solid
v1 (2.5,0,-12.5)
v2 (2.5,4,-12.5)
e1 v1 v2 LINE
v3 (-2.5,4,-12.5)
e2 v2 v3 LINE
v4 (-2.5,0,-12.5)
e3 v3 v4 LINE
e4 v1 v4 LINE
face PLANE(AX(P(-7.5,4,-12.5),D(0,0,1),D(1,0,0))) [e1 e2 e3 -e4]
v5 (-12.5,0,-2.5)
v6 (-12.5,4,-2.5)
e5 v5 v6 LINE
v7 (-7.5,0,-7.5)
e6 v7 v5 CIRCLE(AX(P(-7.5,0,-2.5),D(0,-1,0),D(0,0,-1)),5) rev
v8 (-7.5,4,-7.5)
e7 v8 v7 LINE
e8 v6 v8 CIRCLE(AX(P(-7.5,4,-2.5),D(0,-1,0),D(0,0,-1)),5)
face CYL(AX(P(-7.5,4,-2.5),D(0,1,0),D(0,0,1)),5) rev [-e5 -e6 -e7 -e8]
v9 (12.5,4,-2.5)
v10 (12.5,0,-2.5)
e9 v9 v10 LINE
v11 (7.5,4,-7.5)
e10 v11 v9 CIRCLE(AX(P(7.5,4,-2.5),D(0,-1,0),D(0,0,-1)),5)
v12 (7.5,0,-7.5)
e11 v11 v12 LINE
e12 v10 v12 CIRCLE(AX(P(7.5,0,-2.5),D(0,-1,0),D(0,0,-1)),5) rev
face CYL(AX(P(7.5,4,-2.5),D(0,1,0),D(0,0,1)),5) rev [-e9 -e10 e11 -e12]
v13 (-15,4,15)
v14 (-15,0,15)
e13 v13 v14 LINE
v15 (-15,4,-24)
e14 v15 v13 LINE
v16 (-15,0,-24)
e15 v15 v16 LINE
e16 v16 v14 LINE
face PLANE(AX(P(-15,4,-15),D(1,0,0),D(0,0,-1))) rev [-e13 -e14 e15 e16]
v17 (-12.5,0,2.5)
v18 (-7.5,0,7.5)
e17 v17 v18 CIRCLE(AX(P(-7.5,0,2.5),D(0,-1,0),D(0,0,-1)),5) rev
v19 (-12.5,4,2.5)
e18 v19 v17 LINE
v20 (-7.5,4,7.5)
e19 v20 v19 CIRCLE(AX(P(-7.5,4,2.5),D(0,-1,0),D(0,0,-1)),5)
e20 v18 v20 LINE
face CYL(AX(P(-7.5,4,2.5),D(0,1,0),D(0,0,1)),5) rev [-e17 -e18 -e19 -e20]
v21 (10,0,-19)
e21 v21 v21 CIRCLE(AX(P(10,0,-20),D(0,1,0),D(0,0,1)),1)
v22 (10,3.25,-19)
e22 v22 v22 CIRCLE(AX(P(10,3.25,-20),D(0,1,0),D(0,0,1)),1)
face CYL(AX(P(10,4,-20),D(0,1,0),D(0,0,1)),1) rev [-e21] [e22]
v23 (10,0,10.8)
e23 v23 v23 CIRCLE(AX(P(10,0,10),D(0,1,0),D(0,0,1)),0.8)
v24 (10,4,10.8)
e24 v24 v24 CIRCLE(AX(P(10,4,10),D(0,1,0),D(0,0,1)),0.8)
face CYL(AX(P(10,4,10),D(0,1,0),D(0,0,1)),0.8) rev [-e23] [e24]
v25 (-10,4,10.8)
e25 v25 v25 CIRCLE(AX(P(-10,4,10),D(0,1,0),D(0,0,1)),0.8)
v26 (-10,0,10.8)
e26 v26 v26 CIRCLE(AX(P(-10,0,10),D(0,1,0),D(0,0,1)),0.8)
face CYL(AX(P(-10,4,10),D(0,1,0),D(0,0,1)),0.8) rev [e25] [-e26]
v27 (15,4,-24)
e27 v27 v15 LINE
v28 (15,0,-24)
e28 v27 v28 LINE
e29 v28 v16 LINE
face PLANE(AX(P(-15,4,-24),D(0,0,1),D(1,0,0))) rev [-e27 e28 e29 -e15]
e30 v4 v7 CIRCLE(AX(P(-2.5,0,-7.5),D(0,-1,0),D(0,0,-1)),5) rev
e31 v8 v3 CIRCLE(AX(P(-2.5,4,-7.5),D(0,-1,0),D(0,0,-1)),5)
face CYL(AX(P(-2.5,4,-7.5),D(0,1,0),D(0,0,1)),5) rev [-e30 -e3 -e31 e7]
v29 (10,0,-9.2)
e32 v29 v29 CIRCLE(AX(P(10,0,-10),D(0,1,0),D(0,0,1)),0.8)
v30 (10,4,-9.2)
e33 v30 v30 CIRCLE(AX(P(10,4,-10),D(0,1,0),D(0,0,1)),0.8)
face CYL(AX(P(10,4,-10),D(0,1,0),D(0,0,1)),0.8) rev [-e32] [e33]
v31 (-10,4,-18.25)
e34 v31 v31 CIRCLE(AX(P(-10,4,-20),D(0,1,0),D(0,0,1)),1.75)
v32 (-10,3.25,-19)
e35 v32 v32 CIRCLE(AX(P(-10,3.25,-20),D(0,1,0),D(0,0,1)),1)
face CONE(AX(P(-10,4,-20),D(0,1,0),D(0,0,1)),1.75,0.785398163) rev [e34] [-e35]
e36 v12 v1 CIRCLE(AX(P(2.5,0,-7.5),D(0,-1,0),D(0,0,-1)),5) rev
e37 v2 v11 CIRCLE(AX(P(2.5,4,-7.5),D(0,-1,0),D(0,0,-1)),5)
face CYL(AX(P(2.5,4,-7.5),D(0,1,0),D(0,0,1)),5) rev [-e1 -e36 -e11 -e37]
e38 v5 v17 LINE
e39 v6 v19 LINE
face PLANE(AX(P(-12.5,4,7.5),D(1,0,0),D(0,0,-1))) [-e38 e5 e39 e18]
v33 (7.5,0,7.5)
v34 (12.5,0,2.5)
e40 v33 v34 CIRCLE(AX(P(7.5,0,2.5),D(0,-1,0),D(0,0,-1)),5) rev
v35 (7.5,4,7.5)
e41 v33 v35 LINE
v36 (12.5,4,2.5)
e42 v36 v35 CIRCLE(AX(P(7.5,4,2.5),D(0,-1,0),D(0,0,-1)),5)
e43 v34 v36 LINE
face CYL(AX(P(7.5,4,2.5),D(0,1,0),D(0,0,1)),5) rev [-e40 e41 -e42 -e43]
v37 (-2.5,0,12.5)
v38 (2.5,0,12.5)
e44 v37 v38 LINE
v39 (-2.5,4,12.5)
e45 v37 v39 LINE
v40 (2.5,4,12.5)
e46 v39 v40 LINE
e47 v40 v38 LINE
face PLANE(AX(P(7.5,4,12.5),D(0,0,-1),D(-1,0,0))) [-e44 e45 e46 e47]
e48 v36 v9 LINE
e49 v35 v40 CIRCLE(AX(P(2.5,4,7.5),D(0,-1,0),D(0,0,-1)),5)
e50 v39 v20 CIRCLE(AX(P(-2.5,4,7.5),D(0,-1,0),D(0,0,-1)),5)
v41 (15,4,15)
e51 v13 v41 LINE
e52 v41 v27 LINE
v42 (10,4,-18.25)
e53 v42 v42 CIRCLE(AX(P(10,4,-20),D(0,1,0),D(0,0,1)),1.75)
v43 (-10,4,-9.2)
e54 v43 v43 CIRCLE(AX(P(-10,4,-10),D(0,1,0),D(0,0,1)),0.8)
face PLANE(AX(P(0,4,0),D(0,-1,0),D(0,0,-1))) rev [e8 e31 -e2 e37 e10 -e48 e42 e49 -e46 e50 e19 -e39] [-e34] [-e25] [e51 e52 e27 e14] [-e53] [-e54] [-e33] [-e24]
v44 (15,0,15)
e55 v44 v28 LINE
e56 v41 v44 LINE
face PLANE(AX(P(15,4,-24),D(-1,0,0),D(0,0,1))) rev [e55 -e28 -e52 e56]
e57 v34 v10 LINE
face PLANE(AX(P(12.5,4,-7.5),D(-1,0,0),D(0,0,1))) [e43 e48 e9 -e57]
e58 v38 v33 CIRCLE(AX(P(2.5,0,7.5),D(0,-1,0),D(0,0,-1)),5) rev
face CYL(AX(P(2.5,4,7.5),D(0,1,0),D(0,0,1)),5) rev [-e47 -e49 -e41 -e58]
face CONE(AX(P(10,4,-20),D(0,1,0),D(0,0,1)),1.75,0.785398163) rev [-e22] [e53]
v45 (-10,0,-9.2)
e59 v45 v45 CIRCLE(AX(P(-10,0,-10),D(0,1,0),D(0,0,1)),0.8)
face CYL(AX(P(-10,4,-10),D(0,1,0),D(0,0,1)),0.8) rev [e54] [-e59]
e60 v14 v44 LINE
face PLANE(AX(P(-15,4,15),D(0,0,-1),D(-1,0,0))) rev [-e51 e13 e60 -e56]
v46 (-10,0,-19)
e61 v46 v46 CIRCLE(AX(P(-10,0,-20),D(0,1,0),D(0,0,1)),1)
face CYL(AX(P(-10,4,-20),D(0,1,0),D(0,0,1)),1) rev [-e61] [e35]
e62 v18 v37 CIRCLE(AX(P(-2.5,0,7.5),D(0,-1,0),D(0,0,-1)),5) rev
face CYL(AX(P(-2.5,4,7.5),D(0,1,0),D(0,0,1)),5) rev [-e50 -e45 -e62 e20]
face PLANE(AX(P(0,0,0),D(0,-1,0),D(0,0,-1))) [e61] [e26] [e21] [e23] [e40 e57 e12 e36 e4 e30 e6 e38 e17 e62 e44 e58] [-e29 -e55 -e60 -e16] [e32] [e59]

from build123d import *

# Parameters (mm, degrees)
AUFSATZ_LINEAR_AUSTRAGEN1_DEPTH                      = 4
VERRUNDUNG1_R                                        = 5
FORMSENKUNG_F_R_M3_SENKSCHRAUBE_MIT_INNE_D           = 2
FORMSENKUNG_F_R_M3_SENKSCHRAUBE_MIT_INNE_CSINK_D     = 3.5
FORMSENKUNG_F_R_M3_SENKSCHRAUBE_MIT_INNE_CSINK_ANGLE = 90
M2_GEWINDEBOHRUNG1_D                                 = 1.6


with BuildPart() as part:
    # Skizze1 → Aufsatz-Linear austragen1 (new body)
    with BuildSketch(Plane(origin=(0, 0, 0), x_dir=(1, 0, 0), z_dir=(0, 1, 0))):
        Polygon((-15, 15), (-15, -15), (15, -15), (15, 15), (15, 24), (-15, 24), align=None)
        Polygon((-12.5, 7.5), (-7.5, 7.5), (-7.5, 12.5), (7.5, 12.5), (7.5, 7.5), (12.5, 7.5), (12.5, -7.5), (7.5, -7.5), (7.5, -12.5), (-7.5, -12.5), (-7.5, -7.5), (-12.5, -7.5), align=None, mode=Mode.SUBTRACT)
    extrude(amount=AUFSATZ_LINEAR_AUSTRAGEN1_DEPTH)

    # Verrundung1
    verrundung1_edges = [part.edges().sort_by_distance(p)[0] for p in [
        (-7.5, 2, 12.5),
        (-12.5, 2, 7.5),
        (12.5, 2, 7.5),
        (7.5, 2, 12.5),
        (12.5, 2, -7.5),
        (7.5, 2, -12.5),
        (-7.5, 2, -12.5),
        (-12.5, 2, -7.5),
    ]]
    fillet(verrundung1_edges, radius=VERRUNDUNG1_R - 0.0001)  # a hair under: the kernel refuses the full size

    # Formsenkung für M3 Senkschraube mit Innensechskant1 (through all)
    with Locations(Plane(origin=(0, 4, 0), x_dir=(1, 0, 0), z_dir=(0, 1, 0))):
        with Locations((-10, 20), (10, 20)):
            CounterSinkHole(FORMSENKUNG_F_R_M3_SENKSCHRAUBE_MIT_INNE_D / 2, FORMSENKUNG_F_R_M3_SENKSCHRAUBE_MIT_INNE_CSINK_D / 2, counter_sink_angle=FORMSENKUNG_F_R_M3_SENKSCHRAUBE_MIT_INNE_CSINK_ANGLE)

    # M2 Gewindebohrung1 (through all)
    with Locations(Plane(origin=(0, 4, 0), x_dir=(1, 0, 0), z_dir=(0, 1, 0))):
        with Locations((-10, 10), (10, 10), (10, -10), (-10, -10)):
            Hole(M2_GEWINDEBOHRUNG1_D / 2)


solid = part.part
